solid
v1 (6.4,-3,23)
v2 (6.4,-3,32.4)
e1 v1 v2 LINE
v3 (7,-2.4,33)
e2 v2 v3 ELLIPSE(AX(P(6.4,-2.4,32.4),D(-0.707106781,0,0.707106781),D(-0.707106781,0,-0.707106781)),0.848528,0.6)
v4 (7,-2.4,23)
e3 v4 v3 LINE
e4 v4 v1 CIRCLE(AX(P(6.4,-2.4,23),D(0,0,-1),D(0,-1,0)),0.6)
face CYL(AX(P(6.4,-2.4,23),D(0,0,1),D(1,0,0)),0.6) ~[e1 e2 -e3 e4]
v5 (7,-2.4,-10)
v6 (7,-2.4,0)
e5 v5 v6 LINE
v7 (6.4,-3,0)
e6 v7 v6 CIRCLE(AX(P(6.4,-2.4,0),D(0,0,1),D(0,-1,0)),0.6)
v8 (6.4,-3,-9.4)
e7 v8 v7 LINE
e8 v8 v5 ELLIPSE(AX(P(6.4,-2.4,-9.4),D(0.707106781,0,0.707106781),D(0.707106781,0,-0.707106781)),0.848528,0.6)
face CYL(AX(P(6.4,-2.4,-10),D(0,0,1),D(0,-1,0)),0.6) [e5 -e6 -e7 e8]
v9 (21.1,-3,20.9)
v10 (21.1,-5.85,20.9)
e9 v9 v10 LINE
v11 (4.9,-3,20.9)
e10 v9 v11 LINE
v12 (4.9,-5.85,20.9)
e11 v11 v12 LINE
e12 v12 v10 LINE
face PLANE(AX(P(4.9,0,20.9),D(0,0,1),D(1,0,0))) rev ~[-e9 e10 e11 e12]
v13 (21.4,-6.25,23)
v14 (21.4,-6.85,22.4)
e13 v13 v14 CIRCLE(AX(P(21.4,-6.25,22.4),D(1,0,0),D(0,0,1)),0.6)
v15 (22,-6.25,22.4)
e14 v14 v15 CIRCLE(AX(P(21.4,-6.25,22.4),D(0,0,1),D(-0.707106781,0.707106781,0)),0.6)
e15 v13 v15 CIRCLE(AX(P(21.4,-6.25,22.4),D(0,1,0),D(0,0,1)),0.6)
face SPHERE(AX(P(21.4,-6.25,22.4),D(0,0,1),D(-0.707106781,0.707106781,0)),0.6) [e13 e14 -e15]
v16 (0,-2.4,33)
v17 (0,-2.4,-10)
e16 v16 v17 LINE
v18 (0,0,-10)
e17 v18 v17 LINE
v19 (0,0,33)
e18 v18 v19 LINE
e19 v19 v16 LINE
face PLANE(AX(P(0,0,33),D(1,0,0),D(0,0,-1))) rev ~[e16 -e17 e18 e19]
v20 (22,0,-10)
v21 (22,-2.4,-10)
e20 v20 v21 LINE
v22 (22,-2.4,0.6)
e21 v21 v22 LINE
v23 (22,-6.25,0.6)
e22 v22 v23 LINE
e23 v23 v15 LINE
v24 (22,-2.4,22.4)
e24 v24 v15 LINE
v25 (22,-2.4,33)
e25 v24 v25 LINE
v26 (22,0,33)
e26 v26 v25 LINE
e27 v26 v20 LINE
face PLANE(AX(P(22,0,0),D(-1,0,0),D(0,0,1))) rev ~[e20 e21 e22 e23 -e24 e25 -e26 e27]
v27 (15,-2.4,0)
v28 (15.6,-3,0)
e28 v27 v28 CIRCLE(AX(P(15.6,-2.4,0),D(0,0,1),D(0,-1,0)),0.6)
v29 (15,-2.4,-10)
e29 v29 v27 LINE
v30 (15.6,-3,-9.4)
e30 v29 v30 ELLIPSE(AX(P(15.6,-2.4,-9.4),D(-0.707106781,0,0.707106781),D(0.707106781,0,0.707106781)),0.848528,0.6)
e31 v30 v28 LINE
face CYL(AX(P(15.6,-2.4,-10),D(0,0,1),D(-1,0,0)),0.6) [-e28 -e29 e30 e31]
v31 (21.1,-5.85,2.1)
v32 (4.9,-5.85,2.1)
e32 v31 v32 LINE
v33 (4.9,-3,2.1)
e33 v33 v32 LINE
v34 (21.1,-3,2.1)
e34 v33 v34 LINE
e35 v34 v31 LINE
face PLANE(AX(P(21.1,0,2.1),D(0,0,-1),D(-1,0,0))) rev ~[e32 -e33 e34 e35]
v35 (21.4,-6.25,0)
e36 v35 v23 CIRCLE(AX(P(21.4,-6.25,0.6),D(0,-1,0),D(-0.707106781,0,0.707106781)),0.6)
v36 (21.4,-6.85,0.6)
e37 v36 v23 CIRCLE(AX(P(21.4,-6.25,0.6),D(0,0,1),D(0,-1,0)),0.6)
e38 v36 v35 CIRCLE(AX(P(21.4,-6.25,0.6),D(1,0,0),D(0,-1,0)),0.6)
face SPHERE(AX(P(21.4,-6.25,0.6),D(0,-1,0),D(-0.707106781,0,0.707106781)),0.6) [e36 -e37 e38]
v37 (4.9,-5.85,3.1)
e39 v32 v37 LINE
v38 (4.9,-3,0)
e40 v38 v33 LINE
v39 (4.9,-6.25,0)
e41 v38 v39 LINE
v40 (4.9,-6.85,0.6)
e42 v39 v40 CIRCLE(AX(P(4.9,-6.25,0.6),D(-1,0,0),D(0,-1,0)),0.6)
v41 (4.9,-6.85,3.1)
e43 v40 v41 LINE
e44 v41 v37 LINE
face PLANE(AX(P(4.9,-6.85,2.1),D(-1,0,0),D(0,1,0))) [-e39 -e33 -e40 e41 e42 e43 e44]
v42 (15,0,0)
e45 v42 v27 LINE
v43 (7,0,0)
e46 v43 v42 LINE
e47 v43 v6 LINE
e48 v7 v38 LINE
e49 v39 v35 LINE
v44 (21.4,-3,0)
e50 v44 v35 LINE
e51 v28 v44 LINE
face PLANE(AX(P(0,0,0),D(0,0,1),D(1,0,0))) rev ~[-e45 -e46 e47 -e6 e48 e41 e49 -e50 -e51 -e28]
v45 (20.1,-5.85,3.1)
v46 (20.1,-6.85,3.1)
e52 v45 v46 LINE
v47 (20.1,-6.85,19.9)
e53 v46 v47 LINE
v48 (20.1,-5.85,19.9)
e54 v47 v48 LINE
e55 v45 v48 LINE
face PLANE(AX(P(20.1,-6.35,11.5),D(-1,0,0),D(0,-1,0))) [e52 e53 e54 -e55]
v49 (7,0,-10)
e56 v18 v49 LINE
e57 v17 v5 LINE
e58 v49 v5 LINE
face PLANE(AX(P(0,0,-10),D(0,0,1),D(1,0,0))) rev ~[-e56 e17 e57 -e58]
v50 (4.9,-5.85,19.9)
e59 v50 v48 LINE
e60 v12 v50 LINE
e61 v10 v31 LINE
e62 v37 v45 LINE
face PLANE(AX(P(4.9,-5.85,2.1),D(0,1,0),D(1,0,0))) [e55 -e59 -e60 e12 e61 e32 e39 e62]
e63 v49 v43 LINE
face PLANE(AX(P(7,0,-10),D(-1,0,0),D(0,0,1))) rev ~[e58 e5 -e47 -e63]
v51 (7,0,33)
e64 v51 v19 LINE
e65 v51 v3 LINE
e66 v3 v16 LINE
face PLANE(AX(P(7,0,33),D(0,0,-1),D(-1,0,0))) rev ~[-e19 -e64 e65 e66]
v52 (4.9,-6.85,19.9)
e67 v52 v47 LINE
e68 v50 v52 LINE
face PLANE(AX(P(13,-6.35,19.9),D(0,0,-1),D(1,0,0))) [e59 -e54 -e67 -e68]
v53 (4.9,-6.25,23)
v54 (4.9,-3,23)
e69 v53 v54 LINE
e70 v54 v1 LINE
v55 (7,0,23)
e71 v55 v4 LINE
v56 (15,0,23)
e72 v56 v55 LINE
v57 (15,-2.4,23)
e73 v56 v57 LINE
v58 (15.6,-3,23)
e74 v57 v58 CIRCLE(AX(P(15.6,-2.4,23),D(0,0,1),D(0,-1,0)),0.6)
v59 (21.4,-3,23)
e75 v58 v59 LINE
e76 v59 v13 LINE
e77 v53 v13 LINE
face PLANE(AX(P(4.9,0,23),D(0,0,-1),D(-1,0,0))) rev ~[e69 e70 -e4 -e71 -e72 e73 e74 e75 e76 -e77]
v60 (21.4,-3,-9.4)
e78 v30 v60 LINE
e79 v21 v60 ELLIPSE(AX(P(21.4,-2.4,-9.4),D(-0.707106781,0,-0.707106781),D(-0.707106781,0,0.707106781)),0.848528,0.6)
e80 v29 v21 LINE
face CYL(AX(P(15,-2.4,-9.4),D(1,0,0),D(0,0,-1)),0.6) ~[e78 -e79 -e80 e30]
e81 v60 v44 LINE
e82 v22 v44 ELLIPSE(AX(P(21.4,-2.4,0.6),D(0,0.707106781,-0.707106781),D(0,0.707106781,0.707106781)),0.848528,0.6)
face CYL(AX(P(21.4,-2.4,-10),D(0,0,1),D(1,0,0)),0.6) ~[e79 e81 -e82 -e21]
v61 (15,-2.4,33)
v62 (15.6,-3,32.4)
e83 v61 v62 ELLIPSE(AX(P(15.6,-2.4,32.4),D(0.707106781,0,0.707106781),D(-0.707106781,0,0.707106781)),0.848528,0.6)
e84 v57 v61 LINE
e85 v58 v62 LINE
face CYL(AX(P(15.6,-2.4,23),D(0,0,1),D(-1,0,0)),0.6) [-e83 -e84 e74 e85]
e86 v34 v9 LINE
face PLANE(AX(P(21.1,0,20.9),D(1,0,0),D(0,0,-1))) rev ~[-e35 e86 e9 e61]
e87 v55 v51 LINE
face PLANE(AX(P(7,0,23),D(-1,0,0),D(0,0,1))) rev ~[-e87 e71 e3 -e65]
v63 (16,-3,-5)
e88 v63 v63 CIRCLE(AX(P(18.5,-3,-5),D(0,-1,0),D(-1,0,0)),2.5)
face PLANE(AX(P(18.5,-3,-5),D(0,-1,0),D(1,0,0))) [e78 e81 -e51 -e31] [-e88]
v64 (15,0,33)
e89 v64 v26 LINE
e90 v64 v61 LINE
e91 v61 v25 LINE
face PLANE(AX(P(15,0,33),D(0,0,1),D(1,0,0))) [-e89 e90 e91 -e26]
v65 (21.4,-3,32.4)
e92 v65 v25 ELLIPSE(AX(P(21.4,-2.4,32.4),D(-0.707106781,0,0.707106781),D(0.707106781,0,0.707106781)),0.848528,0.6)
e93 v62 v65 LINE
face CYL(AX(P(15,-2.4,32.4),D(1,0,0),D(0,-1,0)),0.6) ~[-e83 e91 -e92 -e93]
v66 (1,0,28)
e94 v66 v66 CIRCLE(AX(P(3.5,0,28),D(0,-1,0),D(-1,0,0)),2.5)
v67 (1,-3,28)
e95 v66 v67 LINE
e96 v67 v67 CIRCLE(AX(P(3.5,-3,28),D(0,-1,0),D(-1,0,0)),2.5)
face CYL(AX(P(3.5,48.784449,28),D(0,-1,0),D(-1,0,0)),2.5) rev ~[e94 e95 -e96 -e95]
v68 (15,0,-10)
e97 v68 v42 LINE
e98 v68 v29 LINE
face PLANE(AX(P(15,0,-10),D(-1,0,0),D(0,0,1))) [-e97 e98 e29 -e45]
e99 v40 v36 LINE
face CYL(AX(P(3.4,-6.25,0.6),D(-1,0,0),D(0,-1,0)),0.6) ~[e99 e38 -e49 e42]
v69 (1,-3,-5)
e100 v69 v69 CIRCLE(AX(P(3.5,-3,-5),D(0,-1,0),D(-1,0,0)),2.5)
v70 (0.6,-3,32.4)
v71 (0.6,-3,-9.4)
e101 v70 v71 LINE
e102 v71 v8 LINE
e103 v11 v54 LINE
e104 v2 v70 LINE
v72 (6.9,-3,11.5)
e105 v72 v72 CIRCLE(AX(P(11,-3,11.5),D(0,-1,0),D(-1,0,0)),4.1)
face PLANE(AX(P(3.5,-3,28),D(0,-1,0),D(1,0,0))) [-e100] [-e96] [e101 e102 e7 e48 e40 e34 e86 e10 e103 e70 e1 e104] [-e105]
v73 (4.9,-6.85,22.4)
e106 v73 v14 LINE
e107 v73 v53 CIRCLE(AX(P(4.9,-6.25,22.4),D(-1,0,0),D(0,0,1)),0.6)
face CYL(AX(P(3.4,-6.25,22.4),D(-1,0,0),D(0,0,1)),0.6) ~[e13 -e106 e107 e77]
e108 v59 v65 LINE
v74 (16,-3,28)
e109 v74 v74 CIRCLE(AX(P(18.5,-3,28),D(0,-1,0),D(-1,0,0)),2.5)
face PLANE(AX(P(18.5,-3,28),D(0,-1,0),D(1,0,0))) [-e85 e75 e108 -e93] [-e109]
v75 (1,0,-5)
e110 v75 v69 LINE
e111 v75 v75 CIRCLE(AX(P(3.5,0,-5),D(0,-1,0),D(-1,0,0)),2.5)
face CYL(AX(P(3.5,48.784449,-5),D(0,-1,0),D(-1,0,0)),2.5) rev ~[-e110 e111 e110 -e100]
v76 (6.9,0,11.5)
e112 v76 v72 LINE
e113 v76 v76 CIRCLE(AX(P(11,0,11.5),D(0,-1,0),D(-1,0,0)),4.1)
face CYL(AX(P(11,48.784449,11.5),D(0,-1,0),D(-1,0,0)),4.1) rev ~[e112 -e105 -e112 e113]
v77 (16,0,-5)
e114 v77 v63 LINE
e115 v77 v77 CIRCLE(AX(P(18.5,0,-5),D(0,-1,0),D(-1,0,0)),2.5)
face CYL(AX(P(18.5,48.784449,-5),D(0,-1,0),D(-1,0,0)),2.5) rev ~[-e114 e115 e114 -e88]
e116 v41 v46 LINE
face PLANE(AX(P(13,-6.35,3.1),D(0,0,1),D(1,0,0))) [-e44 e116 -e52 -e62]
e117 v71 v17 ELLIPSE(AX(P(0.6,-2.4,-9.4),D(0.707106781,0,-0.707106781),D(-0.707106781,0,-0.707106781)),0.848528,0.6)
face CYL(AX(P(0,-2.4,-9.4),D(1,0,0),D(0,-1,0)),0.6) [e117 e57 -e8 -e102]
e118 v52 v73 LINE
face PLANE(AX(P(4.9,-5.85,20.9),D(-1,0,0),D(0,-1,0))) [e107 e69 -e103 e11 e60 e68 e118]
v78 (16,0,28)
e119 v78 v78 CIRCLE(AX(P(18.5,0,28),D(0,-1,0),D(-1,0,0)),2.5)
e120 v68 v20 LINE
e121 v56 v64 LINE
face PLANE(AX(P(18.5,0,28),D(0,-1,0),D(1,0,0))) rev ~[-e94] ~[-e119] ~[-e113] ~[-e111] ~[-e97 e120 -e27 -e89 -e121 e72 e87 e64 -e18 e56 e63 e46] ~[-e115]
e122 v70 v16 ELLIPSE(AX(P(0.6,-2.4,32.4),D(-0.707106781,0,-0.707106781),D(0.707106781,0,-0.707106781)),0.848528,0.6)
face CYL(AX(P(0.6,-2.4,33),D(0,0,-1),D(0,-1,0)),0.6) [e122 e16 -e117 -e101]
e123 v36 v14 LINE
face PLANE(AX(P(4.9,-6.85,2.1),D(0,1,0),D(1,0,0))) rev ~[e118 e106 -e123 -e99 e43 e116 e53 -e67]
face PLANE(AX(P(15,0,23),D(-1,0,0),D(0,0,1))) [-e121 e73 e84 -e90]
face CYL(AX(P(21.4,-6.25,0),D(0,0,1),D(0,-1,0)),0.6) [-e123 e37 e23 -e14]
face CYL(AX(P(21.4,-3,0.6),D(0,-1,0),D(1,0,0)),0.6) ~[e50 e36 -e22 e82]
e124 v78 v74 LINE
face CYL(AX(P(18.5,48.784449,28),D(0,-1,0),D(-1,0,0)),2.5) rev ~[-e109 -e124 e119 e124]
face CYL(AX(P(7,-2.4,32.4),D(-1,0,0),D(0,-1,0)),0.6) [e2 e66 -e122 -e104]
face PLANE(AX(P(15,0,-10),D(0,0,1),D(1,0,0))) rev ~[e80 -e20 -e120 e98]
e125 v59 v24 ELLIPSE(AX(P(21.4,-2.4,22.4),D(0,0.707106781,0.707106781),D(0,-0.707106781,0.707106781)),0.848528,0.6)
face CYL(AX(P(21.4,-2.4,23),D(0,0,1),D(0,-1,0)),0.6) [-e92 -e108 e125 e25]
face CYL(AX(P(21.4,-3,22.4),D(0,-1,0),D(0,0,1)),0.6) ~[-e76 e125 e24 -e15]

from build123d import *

# Parameters (mm, degrees)
F1_DEPTH      = 3
F2_DEPTH      = 6.85
F6_DEPTH      = 3
F3_W          = 16.2
F3_H          = 1
F7_DEPTH      = 1
F5_W          = 16.2
F5_H          = 1
F8_DEPTH      = 1
F4_W          = 1
F4_H          = 18.8
F9_DEPTH      = 1
F0_W          = 7
F0_H          = 10
F10_DEPTH     = 3
F11_D         = 8.2
F12_D         = 5
F13_R         = 0.6
F14_R         = 0.6
F15_T1_DEPTH  = 18
F15_S5_W      = 0.6
F15_S5_H      = 0.6
F15_T6_DEPTH  = 0.6
F15_S11_W     = 0.6
F15_S11_H     = 0.6
F15_T12_DEPTH = 0.6


# Not quite as in the source:
# - a fillet or chamfer that OpenCascade refuses, or shapes differently, is made with other operations: its cross-section is extruded or revolved along the edge and cut away or added
# - a feature names something its author has since deleted; it is built from what else it names


with BuildPart() as f1:
    # F0 (on Front) → F1 (new body)
    with BuildSketch(Plane.XZ):
        Polygon((0.9, 2.1), (4.9, 2.1), (21.1, 2.1), (21.1, 20.9), (4.9, 20.9), (0.9, 20.9), align=None)
        Polygon((4.9, 2.1), (4.9, 0), (7, 0), (15, 0), (22, 0), (22, 23), (15, 23), (7, 23), (4.9, 23), (4.9, 20.9), (21.1, 20.9), (21.1, 2.1), align=None)
    extrude(amount=F1_DEPTH)

    # F0 (on Front) → F2 (join)
    with BuildSketch(Plane.XZ):
        Polygon((4.9, 2.1), (4.9, 0), (7, 0), (15, 0), (22, 0), (22, 23), (15, 23), (7, 23), (4.9, 23), (4.9, 20.9), (21.1, 20.9), (21.1, 2.1), align=None)
    extrude(amount=F2_DEPTH)

    # F0 (on Front) → F6 (join)
    with BuildSketch(Plane.XZ):
        Polygon((0, 23), (0, 0), (4.9, 0), (4.9, 2.1), (0.9, 2.1), (0.9, 20.9), (4.9, 20.9), (4.9, 23), align=None)
    extrude(amount=F6_DEPTH)

    # F3 (on face) → F7 (join)
    with BuildSketch(Plane(origin=(0, 0, 20.9), x_dir=(1, 0, 0), z_dir=(0, 0, -1))):
        with Locations((13, 6.35)):
            Rectangle(F3_W, F3_H)
    extrude(amount=F7_DEPTH)

    # F5 (on face) → F8 (join)
    with BuildSketch(Plane.XY.offset(2.1)):
        with Locations((13, -6.35)):
            Rectangle(F5_W, F5_H)
    extrude(amount=F8_DEPTH)

    # F4 (on face) → F9 (join)
    with BuildSketch(Plane(origin=(21.1, 0, 0), x_dir=(0, -1, 0), z_dir=(-1, 0, 0))):
        with Locations((6.35, 11.5)):
            Rectangle(F4_W, F4_H)
    extrude(amount=F9_DEPTH)

    # F0 (on Front) → F10 (join)
    with BuildSketch(Plane.XZ):
        with Locations((18.5, 28)):
            Rectangle(F0_W, F0_H)
        with Locations((18.5, -5)):
            Rectangle(F0_W, F0_H)
        Polygon((0, 33), (0, 23), (4.9, 23), (7, 23), (7, 33), align=None)
        Polygon((4.9, 0), (0, 0), (0, -10), (7, -10), (7, 0), align=None)
    extrude(amount=F10_DEPTH)

    # F11 (through all)
    with Locations(Plane(origin=(0, 0, 0), x_dir=(1, 0, 0), z_dir=(0, 1, 0))):
        with Locations((11, -11.5)):
            Hole(F11_D / 2)

    # F12 (through all)
    with Locations(Plane(origin=(0, 0, 0), x_dir=(1, 0, 0), z_dir=(0, 1, 0))):
        with Locations((3.5, -28), (18.5, -28), (3.5, 5), (18.5, 5)):
            Hole(F12_D / 2)

    # F13
    f13_edges = [f1.edges().sort_by_distance(p)[0] for p in [
        (0, -3, 11.5),
        (3.5, -3, -10),
        (7, -3, -5),
        (3.5, -3, 33),
        (7, -3, 28),
    ]]
    fillet(f13_edges, radius=F13_R)

    # F14
    f14_edges = [f1.edges().sort_by_distance(p)[0] for p in [
        (22, -3, -5),
        (18.5, -3, -10),
        (15, -3, -5),
        (22, -4.925, 0),
        (22, -6.85, 11.5),
        (22, -4.925, 23),
        (22, -3, 28),
        (15, -3, 28),
        (18.5, -3, 33),
    ]]
    fillet(f14_edges, radius=F14_R)

    # F15: fillet of radius 0.6 on 2 edges, made by hand

    # F15_s2 → F15_t1 (cut)
    with BuildSketch(Plane.YZ.offset(3.4)):
        with BuildLine():
            ThreePointArc((-6.25, 23), (-6.6742640687, 22.8242640687), (-6.85, 22.4))
            Line((-6.85, 22.4), (-6.85, 23))
            Line((-6.85, 23), (-6.25, 23))
        make_face()
        with BuildLine():
            ThreePointArc((-6.85, 0.6), (-6.6742640687, 0.1757359313), (-6.25, 0))
            Line((-6.25, 0), (-6.85, 0))
            Line((-6.85, 0), (-6.85, 0.6))
        make_face()
    extrude(amount=F15_T1_DEPTH, mode=Mode.SUBTRACT)


with BuildPart() as f15_tool4:
    # F15_s5 → F15_t6 (new body)
    with BuildSketch(Plane.XZ.offset(6.25)):
        with Locations((21.7, 0.3)):
            Rectangle(F15_S5_W, F15_S5_H)
    extrude(amount=F15_T6_DEPTH)

    # F15_s7 → F15_t8 (revolve, cut)
    with BuildSketch(Plane(origin=(21.4, -6.25, 0.6), x_dir=(-0.7071067812, 0, 0.7071067812), z_dir=(0.7071067812, 0, 0.7071067812))):
        with BuildLine():
            ThreePointArc((0, -0.6), (0.6, 0), (0, 0.6))
            Line((0, 0.6), (0, -0.6))
        make_face()
    revolve(axis=Axis((21.4, -6.25, 0.6), (0, -1, 0)), mode=Mode.SUBTRACT)


with BuildPart() as f1_1:
    add(f1.part)

    # F15_t3: cut F15_tool4
    add(f15_tool4.part, mode=Mode.SUBTRACT)


with BuildPart() as f15_tool10:
    # F15_s11 → F15_t12 (new body)
    with BuildSketch(Plane.XY.offset(22.4)):
        with Locations((21.7, -6.55)):
            Rectangle(F15_S11_W, F15_S11_H)
    extrude(amount=F15_T12_DEPTH)

    # F15_s13 → F15_t14 (revolve, cut)
    with BuildSketch(Plane(origin=(21.4, -6.25, 22.4), x_dir=(-0.7071067812, 0.7071067812, 0), z_dir=(0.7071067812, 0.7071067812, 0))):
        with BuildLine():
            ThreePointArc((0, -0.6), (0.6, 0), (0, 0.6))
            Line((0, 0.6), (0, -0.6))
        make_face()
    revolve(axis=Axis((21.4, -6.25, 22.4), (0, 0, 1)), mode=Mode.SUBTRACT)


with BuildPart() as f1_2:
    add(f1_1.part)

    # F15_t9: cut F15_tool10
    add(f15_tool10.part, mode=Mode.SUBTRACT)


solid = f1_2.part
